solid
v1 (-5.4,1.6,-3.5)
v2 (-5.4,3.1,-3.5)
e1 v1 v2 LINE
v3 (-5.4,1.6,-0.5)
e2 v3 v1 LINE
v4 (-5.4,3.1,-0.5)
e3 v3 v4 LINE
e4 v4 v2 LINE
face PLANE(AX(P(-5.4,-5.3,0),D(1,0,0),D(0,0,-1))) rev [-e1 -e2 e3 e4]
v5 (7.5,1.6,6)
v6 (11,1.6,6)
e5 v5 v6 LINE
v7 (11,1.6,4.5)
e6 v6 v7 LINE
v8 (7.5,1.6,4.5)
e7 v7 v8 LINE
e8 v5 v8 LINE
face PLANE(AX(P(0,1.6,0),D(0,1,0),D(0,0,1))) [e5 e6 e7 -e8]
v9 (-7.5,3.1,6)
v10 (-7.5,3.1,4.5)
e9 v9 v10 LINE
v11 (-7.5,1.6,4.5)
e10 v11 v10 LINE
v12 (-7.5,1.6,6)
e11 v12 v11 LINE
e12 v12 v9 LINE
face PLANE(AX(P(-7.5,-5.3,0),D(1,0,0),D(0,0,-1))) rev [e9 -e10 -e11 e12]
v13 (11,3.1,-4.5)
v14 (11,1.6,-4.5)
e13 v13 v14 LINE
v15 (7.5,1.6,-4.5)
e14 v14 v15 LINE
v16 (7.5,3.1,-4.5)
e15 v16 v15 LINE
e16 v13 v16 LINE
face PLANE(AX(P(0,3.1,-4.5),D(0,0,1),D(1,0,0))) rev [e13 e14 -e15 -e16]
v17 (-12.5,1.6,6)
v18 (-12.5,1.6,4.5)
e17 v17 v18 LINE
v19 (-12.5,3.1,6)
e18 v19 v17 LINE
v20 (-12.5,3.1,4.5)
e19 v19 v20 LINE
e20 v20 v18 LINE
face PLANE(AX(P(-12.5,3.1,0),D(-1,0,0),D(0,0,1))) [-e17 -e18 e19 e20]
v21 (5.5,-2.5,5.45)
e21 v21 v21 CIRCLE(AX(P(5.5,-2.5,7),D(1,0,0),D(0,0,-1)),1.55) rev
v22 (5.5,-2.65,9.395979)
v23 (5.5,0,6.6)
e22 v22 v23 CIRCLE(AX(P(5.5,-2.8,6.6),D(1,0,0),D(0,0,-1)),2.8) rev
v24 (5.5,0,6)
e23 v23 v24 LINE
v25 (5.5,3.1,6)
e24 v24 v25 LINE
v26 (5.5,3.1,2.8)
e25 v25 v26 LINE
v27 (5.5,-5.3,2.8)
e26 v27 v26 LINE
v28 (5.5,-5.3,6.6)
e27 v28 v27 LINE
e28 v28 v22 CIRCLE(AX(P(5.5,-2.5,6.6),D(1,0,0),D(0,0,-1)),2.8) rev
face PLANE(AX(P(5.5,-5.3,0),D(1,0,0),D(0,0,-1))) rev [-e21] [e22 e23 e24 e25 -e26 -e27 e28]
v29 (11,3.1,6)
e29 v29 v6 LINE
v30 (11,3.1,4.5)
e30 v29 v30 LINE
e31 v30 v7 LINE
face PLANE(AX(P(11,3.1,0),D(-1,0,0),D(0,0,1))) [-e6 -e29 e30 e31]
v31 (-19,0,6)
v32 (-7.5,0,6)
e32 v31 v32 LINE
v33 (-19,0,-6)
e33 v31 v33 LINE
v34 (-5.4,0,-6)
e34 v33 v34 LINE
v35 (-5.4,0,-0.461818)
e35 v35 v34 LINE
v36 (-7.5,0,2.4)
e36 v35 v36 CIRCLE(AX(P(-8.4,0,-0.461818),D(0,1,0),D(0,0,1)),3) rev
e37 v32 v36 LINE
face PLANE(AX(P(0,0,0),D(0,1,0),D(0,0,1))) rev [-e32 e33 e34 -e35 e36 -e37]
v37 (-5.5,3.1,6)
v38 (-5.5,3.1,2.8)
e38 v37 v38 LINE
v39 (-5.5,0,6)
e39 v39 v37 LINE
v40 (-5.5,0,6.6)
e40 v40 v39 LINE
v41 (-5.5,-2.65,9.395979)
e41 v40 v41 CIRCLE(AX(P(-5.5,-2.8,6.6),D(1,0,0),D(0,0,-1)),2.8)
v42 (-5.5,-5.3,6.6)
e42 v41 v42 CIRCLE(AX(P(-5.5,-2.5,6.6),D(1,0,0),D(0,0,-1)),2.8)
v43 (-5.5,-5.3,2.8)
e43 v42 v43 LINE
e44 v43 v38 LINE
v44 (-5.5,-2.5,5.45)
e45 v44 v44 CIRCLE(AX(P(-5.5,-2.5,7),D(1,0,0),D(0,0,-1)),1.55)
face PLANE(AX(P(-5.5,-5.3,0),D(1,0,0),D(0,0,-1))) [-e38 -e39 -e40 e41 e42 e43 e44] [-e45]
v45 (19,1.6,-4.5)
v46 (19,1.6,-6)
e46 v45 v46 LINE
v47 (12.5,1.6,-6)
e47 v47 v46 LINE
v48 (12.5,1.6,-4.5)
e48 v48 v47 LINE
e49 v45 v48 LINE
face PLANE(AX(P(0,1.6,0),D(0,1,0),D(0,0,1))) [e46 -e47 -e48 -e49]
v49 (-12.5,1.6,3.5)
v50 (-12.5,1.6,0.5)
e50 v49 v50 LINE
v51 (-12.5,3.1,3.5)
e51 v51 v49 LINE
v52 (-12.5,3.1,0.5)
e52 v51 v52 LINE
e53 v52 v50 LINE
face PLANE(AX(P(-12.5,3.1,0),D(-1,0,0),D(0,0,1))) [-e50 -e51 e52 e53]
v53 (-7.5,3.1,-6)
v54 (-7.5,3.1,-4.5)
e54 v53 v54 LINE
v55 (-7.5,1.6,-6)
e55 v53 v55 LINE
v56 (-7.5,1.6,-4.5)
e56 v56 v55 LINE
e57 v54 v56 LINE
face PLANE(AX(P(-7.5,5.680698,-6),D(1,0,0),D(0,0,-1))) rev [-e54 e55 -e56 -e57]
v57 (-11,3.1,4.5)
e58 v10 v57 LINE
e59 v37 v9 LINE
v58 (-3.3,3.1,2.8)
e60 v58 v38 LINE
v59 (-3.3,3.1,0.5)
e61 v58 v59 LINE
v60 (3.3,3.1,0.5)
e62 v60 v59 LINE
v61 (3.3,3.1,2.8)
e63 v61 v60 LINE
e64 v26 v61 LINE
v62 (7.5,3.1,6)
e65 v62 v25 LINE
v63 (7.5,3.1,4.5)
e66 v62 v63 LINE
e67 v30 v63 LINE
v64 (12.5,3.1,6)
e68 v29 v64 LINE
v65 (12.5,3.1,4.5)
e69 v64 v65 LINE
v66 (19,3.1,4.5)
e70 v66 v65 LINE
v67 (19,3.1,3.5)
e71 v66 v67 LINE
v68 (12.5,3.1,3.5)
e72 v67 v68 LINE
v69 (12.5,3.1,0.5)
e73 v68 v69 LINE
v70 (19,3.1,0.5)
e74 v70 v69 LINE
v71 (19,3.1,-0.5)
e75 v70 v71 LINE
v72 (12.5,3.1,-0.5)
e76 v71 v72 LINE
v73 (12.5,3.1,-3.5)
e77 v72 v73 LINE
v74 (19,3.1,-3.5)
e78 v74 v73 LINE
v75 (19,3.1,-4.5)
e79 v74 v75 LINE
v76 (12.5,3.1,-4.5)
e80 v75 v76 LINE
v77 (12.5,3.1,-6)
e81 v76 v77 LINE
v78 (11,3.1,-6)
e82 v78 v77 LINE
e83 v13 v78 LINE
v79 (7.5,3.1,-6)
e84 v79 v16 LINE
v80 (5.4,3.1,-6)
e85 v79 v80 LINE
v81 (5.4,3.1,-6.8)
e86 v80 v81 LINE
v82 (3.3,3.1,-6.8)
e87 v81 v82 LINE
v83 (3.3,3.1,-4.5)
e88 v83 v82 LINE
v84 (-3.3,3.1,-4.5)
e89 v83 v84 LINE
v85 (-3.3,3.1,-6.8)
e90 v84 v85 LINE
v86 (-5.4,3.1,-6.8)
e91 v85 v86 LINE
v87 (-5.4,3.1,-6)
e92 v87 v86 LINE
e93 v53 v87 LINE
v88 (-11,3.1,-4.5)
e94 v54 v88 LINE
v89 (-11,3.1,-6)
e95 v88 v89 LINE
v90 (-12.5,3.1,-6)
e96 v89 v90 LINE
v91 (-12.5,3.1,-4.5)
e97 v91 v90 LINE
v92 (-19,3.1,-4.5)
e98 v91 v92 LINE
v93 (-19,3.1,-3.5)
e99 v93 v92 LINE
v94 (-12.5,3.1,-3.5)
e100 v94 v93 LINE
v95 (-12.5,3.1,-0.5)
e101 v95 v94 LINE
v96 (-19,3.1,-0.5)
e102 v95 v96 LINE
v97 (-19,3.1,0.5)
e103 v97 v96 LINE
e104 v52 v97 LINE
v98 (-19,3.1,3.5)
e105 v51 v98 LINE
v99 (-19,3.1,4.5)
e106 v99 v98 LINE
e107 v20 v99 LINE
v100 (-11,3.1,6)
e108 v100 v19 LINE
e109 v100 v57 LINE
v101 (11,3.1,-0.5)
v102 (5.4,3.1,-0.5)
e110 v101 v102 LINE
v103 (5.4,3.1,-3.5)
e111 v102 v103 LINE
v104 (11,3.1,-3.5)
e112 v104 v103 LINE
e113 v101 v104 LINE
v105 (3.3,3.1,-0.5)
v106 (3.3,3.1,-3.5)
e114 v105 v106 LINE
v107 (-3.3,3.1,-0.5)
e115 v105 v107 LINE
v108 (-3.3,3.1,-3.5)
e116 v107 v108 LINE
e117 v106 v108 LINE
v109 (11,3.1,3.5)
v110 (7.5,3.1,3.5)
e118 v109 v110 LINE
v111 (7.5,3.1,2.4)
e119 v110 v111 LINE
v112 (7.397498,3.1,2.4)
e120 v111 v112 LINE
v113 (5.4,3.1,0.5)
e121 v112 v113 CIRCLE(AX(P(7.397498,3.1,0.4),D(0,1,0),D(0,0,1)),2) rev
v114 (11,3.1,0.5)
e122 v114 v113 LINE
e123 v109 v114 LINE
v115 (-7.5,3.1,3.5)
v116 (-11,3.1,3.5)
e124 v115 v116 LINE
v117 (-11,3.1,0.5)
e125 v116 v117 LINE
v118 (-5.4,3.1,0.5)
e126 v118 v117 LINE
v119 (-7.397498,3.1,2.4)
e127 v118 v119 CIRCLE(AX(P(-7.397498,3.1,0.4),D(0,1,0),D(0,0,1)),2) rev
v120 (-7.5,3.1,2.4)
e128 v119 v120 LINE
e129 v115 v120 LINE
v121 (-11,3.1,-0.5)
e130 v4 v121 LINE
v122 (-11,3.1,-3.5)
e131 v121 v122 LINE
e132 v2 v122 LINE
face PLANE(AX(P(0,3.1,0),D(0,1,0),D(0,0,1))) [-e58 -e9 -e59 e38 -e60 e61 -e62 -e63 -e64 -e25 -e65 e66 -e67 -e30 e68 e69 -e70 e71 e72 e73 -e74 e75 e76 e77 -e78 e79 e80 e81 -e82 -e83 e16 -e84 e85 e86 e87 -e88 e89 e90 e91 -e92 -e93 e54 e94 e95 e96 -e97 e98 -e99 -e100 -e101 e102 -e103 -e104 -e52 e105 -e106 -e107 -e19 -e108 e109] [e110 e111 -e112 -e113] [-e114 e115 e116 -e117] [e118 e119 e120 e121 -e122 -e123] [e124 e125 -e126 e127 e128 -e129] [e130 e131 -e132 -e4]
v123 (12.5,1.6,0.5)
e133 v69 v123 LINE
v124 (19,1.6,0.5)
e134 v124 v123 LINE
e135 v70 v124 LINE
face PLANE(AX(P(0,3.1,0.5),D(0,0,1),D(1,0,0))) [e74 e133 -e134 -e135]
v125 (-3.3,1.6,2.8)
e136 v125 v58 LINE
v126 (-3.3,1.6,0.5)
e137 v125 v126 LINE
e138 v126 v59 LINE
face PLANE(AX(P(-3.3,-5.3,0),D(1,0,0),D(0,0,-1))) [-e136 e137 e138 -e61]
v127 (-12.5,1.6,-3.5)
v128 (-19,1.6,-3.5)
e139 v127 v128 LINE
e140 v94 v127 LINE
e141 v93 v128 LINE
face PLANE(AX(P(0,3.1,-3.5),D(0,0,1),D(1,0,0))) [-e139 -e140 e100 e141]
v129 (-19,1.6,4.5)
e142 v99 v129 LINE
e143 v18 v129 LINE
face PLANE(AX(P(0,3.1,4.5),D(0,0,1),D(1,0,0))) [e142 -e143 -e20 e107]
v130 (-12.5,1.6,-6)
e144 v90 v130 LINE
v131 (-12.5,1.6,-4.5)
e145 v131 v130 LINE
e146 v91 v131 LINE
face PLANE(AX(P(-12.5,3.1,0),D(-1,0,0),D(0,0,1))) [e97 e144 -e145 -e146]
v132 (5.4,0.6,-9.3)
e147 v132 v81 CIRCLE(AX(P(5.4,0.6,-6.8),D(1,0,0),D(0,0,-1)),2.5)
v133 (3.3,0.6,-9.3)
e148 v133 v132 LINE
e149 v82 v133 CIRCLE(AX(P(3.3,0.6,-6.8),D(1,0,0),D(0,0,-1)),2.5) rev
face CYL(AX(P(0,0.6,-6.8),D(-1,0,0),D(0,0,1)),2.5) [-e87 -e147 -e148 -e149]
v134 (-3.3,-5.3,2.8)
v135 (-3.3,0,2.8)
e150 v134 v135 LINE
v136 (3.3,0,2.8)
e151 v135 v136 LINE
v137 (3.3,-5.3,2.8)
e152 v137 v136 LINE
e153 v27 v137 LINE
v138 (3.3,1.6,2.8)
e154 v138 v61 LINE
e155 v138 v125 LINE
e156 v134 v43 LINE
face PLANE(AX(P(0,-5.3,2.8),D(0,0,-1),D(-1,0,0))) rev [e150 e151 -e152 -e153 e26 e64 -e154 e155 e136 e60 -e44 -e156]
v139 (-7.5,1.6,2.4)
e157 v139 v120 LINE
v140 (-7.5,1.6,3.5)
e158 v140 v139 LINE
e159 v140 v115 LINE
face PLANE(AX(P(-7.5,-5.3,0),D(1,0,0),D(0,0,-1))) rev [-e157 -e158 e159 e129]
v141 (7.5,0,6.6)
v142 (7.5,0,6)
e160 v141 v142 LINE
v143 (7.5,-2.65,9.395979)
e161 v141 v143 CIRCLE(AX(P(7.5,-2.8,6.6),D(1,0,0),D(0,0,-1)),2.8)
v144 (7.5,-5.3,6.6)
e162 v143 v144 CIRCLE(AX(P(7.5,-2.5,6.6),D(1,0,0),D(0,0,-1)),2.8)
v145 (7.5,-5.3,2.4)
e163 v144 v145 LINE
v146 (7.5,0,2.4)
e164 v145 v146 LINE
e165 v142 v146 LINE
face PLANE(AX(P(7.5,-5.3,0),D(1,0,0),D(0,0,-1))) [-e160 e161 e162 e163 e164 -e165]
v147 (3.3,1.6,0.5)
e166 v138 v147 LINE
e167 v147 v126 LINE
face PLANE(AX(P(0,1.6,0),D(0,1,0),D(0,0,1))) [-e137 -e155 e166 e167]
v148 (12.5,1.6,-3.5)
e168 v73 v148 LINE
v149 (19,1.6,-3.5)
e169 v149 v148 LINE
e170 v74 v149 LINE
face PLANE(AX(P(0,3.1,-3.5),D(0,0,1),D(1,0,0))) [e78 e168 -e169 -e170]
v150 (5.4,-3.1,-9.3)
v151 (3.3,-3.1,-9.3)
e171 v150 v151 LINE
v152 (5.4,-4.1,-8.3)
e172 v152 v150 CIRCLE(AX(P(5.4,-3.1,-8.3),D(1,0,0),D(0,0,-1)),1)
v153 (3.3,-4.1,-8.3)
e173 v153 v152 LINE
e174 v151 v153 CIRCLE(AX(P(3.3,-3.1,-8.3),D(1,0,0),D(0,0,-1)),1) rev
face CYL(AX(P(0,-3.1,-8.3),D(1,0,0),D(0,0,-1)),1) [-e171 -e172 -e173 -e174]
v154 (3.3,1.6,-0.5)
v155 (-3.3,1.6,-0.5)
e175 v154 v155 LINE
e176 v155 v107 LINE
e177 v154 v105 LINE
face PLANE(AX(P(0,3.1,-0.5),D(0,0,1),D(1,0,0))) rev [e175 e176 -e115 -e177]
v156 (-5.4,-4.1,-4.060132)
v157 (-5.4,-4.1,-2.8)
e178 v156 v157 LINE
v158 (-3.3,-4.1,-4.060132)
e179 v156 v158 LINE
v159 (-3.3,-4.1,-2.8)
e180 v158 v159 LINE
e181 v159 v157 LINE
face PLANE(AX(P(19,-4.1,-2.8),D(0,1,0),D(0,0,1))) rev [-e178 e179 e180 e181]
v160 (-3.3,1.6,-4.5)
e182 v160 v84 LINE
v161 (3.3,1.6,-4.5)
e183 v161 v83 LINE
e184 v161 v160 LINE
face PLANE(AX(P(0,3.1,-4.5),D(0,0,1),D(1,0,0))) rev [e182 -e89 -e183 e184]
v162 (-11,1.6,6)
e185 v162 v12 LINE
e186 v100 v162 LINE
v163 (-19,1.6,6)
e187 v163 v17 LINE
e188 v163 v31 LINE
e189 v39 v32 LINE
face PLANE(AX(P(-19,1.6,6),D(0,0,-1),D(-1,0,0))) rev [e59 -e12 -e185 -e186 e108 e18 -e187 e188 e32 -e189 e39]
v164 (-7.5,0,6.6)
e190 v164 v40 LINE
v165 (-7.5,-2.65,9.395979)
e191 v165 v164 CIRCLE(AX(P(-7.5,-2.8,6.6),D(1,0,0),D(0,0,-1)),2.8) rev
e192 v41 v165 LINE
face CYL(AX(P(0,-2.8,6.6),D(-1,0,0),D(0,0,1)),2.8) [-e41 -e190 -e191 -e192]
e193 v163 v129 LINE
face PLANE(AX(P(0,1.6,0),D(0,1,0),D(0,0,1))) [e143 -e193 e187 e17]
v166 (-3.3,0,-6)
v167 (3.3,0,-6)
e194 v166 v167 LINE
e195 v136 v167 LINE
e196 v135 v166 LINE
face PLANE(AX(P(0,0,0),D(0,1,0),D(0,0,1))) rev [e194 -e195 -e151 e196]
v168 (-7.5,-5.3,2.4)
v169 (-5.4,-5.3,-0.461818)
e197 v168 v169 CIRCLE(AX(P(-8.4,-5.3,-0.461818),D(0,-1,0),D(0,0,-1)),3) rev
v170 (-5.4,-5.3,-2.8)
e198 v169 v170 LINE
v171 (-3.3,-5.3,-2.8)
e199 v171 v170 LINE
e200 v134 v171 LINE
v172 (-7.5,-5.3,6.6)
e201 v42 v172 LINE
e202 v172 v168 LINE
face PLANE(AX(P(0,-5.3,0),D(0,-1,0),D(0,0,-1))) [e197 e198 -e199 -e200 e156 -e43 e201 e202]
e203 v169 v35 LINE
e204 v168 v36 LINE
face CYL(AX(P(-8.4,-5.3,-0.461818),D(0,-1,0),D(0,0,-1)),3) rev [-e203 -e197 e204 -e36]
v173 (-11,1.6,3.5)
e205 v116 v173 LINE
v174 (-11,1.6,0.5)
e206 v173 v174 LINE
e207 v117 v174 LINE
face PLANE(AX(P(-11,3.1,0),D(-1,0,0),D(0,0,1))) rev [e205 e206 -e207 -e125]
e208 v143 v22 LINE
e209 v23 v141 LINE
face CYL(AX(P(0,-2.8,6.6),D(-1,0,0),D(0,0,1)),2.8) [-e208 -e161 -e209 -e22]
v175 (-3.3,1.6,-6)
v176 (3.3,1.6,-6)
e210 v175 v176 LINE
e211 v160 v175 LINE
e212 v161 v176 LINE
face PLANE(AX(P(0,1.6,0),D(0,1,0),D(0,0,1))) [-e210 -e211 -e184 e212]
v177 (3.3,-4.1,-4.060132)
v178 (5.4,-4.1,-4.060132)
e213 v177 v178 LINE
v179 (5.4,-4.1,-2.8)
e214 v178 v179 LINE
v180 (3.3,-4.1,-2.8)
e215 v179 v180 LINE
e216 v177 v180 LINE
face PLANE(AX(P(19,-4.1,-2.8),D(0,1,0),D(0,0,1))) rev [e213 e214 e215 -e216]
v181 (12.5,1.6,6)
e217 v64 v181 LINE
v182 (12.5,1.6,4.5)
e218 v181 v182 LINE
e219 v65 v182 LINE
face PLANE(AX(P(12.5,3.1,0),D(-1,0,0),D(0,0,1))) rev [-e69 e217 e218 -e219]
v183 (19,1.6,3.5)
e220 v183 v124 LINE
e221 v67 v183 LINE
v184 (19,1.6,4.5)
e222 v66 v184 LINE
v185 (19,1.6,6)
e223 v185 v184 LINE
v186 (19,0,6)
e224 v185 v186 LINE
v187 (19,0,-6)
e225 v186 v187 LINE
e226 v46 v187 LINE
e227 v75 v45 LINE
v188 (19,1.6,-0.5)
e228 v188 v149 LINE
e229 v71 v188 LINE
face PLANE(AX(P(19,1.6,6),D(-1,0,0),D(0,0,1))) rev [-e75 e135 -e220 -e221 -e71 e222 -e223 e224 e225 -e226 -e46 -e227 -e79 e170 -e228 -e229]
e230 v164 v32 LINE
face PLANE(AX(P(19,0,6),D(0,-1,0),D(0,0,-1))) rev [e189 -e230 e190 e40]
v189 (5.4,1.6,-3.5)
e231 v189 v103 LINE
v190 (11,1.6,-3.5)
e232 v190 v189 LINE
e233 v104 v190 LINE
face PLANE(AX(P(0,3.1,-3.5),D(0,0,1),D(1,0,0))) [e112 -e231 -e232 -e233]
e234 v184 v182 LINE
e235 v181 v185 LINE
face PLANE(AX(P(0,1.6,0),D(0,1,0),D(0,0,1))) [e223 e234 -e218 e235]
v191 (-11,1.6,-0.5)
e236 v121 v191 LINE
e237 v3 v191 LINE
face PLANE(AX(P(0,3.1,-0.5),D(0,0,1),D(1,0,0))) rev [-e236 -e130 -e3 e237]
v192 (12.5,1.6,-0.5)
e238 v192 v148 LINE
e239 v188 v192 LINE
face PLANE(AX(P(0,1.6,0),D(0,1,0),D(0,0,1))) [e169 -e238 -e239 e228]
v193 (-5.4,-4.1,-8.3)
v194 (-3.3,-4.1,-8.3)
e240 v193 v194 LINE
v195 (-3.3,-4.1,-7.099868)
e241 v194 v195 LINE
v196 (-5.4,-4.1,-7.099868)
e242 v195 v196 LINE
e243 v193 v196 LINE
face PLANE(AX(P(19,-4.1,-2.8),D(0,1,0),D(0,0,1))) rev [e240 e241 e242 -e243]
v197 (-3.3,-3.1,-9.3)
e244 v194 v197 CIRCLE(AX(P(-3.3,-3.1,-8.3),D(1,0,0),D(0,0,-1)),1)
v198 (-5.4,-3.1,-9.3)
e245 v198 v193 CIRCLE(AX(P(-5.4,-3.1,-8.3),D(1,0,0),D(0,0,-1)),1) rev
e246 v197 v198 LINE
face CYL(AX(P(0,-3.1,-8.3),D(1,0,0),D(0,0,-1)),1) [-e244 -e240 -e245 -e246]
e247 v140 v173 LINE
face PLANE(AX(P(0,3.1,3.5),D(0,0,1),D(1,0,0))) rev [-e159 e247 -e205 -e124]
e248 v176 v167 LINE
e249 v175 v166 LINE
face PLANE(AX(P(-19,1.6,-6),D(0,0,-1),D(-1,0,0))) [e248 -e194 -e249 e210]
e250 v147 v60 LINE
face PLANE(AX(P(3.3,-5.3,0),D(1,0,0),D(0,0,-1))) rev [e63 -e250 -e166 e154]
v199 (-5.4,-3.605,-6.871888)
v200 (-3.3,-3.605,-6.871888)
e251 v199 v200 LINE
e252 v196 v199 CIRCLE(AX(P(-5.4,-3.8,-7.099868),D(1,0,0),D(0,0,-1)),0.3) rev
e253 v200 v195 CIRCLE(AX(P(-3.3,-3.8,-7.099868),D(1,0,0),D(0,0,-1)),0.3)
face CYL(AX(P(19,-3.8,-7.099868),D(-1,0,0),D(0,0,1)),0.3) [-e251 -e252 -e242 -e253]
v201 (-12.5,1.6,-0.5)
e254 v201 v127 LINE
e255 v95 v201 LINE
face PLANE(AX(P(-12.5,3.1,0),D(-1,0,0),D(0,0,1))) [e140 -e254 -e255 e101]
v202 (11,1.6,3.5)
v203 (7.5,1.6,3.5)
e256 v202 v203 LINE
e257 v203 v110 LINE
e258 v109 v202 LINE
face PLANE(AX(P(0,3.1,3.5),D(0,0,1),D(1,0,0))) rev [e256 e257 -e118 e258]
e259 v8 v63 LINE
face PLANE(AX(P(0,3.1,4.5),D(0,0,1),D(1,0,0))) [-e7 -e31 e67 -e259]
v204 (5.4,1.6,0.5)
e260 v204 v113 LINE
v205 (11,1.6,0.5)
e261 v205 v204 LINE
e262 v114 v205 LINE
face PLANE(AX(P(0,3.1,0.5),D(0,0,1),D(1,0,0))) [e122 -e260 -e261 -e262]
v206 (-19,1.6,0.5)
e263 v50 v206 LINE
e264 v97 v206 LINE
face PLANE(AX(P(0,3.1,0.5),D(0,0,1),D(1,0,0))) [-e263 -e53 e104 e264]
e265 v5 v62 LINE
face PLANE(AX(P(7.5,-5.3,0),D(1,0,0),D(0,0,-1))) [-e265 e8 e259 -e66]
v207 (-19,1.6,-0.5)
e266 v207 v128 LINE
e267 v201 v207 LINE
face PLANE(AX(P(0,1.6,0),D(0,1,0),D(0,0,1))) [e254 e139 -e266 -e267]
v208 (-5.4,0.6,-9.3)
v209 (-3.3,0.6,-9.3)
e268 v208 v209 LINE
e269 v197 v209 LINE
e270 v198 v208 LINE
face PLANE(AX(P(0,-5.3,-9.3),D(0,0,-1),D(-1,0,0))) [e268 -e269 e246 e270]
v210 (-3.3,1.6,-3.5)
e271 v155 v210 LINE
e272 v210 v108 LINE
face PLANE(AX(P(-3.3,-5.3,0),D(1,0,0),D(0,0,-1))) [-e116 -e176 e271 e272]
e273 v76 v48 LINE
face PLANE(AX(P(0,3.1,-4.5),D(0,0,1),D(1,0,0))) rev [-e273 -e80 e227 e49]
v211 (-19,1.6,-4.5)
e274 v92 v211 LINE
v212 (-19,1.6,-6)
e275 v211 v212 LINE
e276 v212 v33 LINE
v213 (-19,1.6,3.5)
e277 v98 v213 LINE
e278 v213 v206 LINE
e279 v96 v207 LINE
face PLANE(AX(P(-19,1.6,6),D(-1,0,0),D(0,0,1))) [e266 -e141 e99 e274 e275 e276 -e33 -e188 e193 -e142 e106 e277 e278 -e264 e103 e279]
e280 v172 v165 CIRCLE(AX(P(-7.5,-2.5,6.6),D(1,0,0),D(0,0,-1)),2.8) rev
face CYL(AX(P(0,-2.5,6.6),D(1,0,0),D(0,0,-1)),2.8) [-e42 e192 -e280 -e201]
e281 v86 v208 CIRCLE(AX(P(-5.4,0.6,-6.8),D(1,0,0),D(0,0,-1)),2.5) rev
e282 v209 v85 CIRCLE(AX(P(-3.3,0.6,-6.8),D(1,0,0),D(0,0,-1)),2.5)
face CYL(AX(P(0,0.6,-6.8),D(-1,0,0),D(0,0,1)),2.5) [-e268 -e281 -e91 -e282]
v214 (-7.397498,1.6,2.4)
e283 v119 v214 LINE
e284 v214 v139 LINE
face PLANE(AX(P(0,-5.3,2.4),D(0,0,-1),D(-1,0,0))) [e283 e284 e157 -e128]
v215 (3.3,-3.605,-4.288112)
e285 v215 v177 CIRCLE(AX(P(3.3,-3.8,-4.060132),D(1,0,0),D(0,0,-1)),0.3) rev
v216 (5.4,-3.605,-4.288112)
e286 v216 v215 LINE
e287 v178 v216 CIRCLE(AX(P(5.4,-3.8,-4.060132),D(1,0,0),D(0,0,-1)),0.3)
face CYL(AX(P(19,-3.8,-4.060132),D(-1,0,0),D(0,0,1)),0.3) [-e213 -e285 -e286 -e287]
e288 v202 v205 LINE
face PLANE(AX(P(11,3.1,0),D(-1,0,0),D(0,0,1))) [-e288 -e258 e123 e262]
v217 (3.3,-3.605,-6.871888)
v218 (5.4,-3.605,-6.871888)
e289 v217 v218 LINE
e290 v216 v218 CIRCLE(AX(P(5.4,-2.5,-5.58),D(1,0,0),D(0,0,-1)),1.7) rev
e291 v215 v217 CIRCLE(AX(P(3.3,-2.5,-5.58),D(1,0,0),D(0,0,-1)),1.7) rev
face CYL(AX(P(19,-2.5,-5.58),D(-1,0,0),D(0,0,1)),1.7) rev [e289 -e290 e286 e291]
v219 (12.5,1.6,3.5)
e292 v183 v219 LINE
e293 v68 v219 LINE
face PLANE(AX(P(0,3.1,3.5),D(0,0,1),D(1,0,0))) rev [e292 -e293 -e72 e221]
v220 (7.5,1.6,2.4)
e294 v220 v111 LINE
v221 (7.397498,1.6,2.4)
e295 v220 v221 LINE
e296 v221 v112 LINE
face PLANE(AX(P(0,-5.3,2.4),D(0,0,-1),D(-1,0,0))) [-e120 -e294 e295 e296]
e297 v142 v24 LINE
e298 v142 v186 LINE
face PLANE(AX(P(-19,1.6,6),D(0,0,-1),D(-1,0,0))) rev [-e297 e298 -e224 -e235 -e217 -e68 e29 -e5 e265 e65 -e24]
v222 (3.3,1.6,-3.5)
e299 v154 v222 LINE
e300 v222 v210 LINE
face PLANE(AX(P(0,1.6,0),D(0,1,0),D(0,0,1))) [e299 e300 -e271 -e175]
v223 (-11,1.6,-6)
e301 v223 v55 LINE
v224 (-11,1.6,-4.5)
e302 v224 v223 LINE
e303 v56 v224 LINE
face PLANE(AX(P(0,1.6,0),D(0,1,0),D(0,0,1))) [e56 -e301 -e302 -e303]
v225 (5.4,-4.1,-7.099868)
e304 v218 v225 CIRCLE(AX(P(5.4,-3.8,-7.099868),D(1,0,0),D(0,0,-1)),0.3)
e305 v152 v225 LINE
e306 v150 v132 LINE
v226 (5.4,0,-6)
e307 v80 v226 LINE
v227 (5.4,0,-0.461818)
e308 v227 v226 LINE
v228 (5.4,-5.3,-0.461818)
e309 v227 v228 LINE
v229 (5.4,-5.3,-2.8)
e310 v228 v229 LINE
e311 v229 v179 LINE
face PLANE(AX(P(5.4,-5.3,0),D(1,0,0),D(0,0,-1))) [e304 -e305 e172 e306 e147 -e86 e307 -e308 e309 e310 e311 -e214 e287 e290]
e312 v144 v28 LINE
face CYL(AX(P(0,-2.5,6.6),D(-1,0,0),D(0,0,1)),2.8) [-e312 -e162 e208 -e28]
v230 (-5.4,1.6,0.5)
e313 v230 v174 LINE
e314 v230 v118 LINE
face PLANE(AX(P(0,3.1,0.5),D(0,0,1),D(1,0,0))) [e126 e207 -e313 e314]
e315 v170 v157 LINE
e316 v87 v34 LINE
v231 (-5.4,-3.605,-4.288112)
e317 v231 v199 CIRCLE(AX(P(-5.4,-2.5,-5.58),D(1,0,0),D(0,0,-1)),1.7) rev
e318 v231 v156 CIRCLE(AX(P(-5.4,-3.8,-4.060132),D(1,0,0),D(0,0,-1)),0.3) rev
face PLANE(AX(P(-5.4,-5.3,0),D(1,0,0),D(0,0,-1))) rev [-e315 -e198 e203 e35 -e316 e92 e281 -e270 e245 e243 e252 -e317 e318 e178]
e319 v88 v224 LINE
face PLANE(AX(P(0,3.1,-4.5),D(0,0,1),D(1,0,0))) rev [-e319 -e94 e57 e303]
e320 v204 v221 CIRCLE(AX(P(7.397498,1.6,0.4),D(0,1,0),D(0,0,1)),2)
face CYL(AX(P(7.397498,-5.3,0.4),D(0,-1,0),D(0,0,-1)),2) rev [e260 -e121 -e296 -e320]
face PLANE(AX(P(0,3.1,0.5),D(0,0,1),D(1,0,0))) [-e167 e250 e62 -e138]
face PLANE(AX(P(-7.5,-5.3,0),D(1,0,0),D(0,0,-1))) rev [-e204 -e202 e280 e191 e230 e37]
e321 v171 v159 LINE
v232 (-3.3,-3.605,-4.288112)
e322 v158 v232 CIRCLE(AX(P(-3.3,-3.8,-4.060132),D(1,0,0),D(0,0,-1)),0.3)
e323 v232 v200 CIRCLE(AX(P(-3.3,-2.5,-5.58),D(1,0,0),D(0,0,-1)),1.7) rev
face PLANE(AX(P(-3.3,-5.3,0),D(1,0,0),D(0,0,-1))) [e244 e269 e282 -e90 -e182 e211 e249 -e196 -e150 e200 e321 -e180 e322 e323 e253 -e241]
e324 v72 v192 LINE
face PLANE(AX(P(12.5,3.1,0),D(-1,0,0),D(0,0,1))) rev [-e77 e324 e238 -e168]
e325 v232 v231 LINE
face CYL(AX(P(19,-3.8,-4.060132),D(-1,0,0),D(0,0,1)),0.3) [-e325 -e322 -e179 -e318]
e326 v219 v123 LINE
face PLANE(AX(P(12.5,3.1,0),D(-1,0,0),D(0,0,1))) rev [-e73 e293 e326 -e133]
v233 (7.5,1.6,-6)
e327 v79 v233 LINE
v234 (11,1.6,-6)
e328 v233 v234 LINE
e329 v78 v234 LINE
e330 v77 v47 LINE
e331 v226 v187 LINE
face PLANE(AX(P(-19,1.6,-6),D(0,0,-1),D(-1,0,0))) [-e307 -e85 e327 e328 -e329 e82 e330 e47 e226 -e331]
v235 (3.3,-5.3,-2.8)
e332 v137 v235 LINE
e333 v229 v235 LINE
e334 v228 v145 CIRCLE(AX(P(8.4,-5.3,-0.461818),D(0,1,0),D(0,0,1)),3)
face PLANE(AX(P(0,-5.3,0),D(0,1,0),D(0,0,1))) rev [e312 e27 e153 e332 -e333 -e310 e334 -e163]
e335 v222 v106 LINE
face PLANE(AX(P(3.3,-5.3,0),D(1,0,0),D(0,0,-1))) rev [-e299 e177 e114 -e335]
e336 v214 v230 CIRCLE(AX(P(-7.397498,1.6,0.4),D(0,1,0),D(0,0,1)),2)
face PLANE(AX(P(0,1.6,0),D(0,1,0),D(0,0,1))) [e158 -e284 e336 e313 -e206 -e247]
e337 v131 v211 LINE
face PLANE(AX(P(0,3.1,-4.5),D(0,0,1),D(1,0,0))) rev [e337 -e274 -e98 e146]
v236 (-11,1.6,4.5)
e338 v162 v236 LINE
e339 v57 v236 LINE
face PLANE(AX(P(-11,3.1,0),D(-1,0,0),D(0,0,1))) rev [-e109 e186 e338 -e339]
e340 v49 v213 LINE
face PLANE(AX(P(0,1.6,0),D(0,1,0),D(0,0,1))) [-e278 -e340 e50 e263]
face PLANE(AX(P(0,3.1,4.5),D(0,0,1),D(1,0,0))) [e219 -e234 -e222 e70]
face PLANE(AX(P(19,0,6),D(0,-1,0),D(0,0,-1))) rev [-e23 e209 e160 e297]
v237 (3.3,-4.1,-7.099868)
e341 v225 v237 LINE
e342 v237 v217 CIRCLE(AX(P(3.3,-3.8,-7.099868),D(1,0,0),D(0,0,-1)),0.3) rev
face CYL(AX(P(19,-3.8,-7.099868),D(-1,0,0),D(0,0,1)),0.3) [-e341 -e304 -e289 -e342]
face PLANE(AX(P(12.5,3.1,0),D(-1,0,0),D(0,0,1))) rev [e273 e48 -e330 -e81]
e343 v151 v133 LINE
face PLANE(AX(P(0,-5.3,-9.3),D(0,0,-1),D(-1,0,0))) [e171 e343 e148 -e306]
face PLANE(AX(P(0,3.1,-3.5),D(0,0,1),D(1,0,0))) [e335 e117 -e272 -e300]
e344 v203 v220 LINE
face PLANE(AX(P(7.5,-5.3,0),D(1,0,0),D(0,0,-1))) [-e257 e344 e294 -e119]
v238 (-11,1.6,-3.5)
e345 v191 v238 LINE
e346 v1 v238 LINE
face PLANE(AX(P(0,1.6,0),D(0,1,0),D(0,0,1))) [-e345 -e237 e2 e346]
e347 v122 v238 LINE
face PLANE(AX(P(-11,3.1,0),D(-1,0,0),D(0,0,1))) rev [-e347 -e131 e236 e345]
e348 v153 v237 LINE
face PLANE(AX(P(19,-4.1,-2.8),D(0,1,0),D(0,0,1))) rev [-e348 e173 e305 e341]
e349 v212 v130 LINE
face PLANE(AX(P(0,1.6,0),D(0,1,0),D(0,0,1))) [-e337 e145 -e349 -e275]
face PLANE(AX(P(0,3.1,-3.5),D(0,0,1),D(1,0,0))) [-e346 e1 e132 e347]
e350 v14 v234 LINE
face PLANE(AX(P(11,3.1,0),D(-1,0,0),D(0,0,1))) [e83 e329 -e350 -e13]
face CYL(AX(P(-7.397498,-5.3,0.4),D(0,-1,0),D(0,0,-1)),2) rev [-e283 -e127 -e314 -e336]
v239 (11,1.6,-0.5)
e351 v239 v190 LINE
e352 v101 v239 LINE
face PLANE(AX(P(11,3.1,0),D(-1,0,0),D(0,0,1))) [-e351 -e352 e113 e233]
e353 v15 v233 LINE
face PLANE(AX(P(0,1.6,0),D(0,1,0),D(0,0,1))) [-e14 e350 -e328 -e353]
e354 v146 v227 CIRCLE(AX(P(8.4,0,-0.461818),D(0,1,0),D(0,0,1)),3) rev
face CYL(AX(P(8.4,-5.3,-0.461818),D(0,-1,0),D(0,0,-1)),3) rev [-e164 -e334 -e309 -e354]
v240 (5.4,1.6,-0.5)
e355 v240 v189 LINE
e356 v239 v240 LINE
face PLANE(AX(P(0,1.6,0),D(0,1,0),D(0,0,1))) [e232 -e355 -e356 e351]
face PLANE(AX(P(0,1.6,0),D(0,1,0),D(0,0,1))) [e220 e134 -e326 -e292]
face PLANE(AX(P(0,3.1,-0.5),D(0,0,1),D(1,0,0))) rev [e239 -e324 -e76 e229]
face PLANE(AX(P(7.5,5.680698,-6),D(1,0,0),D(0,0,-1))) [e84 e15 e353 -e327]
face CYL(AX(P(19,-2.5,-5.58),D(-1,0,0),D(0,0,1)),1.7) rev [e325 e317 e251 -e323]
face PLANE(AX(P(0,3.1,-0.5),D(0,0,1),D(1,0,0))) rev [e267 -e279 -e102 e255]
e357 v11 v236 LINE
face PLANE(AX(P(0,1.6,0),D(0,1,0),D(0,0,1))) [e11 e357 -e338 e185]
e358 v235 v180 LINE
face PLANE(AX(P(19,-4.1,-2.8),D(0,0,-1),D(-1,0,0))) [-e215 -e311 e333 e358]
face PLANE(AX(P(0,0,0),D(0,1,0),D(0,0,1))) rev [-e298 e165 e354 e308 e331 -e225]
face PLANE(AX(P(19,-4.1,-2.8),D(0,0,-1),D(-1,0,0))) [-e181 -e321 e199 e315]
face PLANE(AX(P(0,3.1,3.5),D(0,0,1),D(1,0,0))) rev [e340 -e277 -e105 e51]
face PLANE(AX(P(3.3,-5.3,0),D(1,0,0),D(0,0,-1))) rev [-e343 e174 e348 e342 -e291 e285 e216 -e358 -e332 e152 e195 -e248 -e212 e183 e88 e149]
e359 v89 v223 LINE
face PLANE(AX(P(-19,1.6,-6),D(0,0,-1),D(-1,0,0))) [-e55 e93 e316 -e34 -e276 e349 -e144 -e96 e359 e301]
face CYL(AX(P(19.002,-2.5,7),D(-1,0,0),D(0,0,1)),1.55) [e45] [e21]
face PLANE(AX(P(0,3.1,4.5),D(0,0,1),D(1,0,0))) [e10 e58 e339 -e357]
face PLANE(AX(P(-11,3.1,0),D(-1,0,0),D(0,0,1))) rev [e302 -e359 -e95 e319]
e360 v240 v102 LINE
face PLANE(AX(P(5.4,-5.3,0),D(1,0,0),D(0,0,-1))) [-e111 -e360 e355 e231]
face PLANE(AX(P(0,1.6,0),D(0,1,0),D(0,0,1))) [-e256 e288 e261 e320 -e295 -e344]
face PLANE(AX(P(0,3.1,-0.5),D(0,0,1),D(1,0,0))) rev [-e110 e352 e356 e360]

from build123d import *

# Parameters (mm, degrees)
SKETCH_1_W               = 38
SKETCH_1_H               = 12
EXTRUDE_1_DEPTH          = 1.6
EXTRUDE_START            = 1.6
SKETCH_1_3_W             = 38
SKETCH_1_3_H             = 1
SKETCH_1_3_W_2           = 1.5
SKETCH_1_3_H_2           = 12
EXTRUDE_2_DEPTH          = 1.5
EXTRUDE_START_2          = 3.1
EXTRUDE_3_DEPTH          = 8.4
SKETCH_2_4_W             = 2.1
SKETCH_2_4_H             = 1.5
EXTRUDE_5_DEPTH          = 3.1
CUT_EXTRUDE_1_DEPTH      = 22.850629282
FILLET_1_R               = 3
EXTRUDE_4_REACH          = 28.771
SKETCH_3_R               = 1.55
CUT_EXTRUDE_2_DEPTH      = 27.771253239
CUT_EXTRUDE_2_DEPTH_BACK = 27.771253239
SKETCH_3_3_R             = 1.7
SKETCH_3_3_W             = 6.5
SKETCH_3_3_H             = 1.2
SKETCH_3_3_W_2           = 3.4
SKETCH_3_3_H_2           = 3.1
FILLET_2_R               = 2.8
FILLET_3_R               = 2.5
FILLET_4_R               = 1
FILLET_5_R               = 0.3
FILLET_6_R               = 2


with BuildPart() as part:
    # 草图1 → 凸台-拉伸1 (new body)
    with BuildSketch(Plane(origin=(0, 0, 0), x_dir=(1, 0, 0), z_dir=(0, 1, 0))):
        Rectangle(SKETCH_1_W, SKETCH_1_H)
    extrude(amount=EXTRUDE_1_DEPTH)

    # 草图1<3> → 凸台-拉伸2 (add)
    with BuildSketch(Plane(origin=(0, 0, 0), x_dir=(1, 0, 0), z_dir=(0, 1, 0)).offset(EXTRUDE_START)):
        with Locations((0, 4)):
            Rectangle(SKETCH_1_3_W, SKETCH_1_3_H)
        Rectangle(SKETCH_1_3_W, SKETCH_1_3_H)
        with Locations((0, -4)):
            Rectangle(SKETCH_1_3_W, SKETCH_1_3_H)
        with Locations((-11.75, 0)):
            Rectangle(SKETCH_1_3_W_2, SKETCH_1_3_H_2)
        with Locations((11.75, 0)):
            Rectangle(SKETCH_1_3_W_2, SKETCH_1_3_H_2)
    extrude(amount=EXTRUDE_2_DEPTH)

    # 草图2 → 凸台-拉伸3 (add)
    with BuildSketch(Plane(origin=(0, 0, 0), x_dir=(1, 0, 0), z_dir=(0, 1, 0)).offset(EXTRUDE_START_2)):
        Polygon((-3.3, 9.3), (-5.4, 9.3), (-5.4, -2.4), (-7.5, -2.4), (-7.5, -9.4), (-5.5, -9.4), (-5.5, -2.8), (-3.3, -2.8), align=None)
        Polygon((5.4, 9.3), (3.3, 9.3), (3.3, -2.8), (5.5, -2.8), (5.5, -9.4), (7.5, -9.4), (7.5, -2.4), (5.4, -2.4), align=None)
    extrude(amount=-EXTRUDE_3_DEPTH)

    # 草图2<4> → 凸台-拉伸5 (add)
    with BuildSketch(Plane(origin=(0, 0, 0), x_dir=(1, 0, 0), z_dir=(0, 1, 0))):
        with Locations((-6.45, 5.25)):
            Rectangle(SKETCH_2_4_W, SKETCH_2_4_H)
        with Locations((6.45, 5.25)):
            Rectangle(SKETCH_2_4_W, SKETCH_2_4_H)
    extrude(amount=EXTRUDE_5_DEPTH)

    # 草图2<3> → 切除-拉伸1 (cut, through all)
    with BuildSketch(Plane(origin=(0, 0, 0), x_dir=(1, 0, 0), z_dir=(0, 1, 0))):
        Polygon((0, -9.4), (0, -2.8), (-3.3, -2.8), (-5.4, -2.8), (-5.5, -2.8), (-5.5, -9.4), align=None)
        Polygon((3.3, -2.8), (0, -2.8), (0, -9.4), (5.5, -9.4), (5.5, -2.8), (5.4, -2.8), align=None)
    extrude(amount=CUT_EXTRUDE_1_DEPTH, mode=Mode.SUBTRACT)

    # 圆角1
    # the kernel refuses this fillet: 3 mm, written as the material it adds along each edge
    with BuildSketch(Plane(origin=(5.4, 7.154544011, 2.4), x_dir=(1, 0, 0), z_dir=(0, -1, 0))) as fillet_1_piece_1_section:
        with BuildLine():
            CenterArc((3, -2.861817604), FILLET_1_R, 107.457603124, 72.542396876)
            Line((0, -2.861817604), (0, 0))
            Line((0, 0), (2.1, 0))
        make_face()
    fillet_1_piece_1 = extrude(amount=12.454544011, mode=Mode.PRIVATE)
    fillet_1_piece_1 = split(fillet_1_piece_1, bisect_by=Plane(origin=(6.297598678, 1.6, 1.686657362), z_dir=(0, -1, 0)), keep=Keep.TOP, mode=Mode.PRIVATE)
    add(fillet_1_piece_1)
    with BuildSketch(Plane(origin=(-5.4, 0, 2.4), x_dir=(0, 0, -1), z_dir=(0, -1, 0))) as fillet_1_piece_2:
        with BuildLine():
            CenterArc((2.861817604, -3), FILLET_1_R, 90, 72.542396876)
            Line((0, -2.1), (0, 0))
            Line((0, 0), (2.861817604, 0))
        make_face()
    extrude(amount=5.3)

    # 草图3 → 凸台-拉伸4 (add, up to next)
    with BuildSketch(Plane(origin=(-5.5, 0, 0), x_dir=(0, 0, -1), z_dir=(1, 0, 0)), mode=Mode.PRIVATE) as extrude_4_sk1:
        with Locations((-7, -2.5)):
            Circle(SKETCH_3_R)
    extrude_4_tool1 = extrude(extrude_4_sk1.sketch, amount=EXTRUDE_4_REACH, mode=Mode.PRIVATE) - part.part
    add(extrude_4_tool1.solids().sort_by_distance((-5.5, -2.5, 7))[0])

    # 草图3<3> → 切除-拉伸2 (cut, two sides: drawn at the far end of the back side and taken through both)
    with BuildSketch(Plane(origin=(-5.5, 0, 0), x_dir=(0, 0, -1), z_dir=(1, 0, 0)).offset(-CUT_EXTRUDE_2_DEPTH_BACK)):
        with Locations((5.58, -2.5)):
            Circle(SKETCH_3_3_R)
        with Locations((6.05, -4.7)):
            Rectangle(SKETCH_3_3_W, SKETCH_3_3_H)
        with Locations((-7.7, 1.55)):
            Rectangle(SKETCH_3_3_W_2, SKETCH_3_3_H_2)
    extrude(amount=CUT_EXTRUDE_2_DEPTH + CUT_EXTRUDE_2_DEPTH_BACK, mode=Mode.SUBTRACT)

    # 圆角2
    # the kernel refuses this fillet: 2.8 mm, written as the material it takes off along each edge
    with BuildSketch(Plane(origin=(-1.5, 0, 9.4), x_dir=(0, 0, -1), z_dir=(1, 0, 0)), Plane(origin=(-14.5, 0, 9.4), x_dir=(0, 0, -1), z_dir=(1, 0, 0))) as fillet_2_piece_1:
        with BuildLine():
            CenterArc((FILLET_2_R, -FILLET_2_R), FILLET_2_R, 90, 90)
            Line((0, -FILLET_2_R), (0, 0))
            Line((0, 0), (FILLET_2_R, 0))
        make_face()
    extrude(amount=16, mode=Mode.SUBTRACT)
    with BuildSketch(Plane(origin=(-1.5, -5.3, 9.4), x_dir=(0, 0, -1), z_dir=(1, 0, 0)), Plane(origin=(-14.5, -5.3, 9.4), x_dir=(0, 0, -1), z_dir=(1, 0, 0))) as fillet_2_piece_2:
        with BuildLine():
            CenterArc((FILLET_2_R, FILLET_2_R), FILLET_2_R, 180, 90)
            Line((0, FILLET_2_R), (0, 0))
            Line((0, 0), (FILLET_2_R, 0))
        make_face()
    extrude(amount=16, mode=Mode.SUBTRACT)

    # 圆角3
    fillet_3_edges = [part.edges().sort_by_distance(p)[0] for p in [
        (-4.35, 3.1, -9.3),
        (4.35, 3.1, -9.3),
    ]]
    fillet(fillet_3_edges, radius=FILLET_3_R)

    # 圆角4
    fillet_4_edges = [part.edges().sort_by_distance(p)[0] for p in [
        (-4.35, -4.1, -9.3),
        (4.35, -4.1, -9.3),
    ]]
    fillet(fillet_4_edges, radius=FILLET_4_R)

    # 圆角5
    fillet_5_edges = [part.edges().sort_by_distance(p)[0] for p in [
        (-4.35, -4.1, -5.005543735),
        (4.35, -4.1, -5.005543735),
        (-4.35, -4.1, -6.154456265),
        (4.35, -4.1, -6.154456265),
    ]]
    fillet(fillet_5_edges, radius=FILLET_5_R)

    # 圆角6
    # the kernel refuses this fillet: 2 mm, written as the material it adds along each edge
    with BuildSketch(Plane(origin=(5.4, 3.1, 2.4), x_dir=(0, 0, -1), z_dir=(0, -1, 0))) as fillet_6_piece_1:
        with BuildLine():
            CenterArc((2, 1.997498436), FILLET_6_R, 180, 87.134016017)
            Line((0, 1.997498436), (-0.04, 1.997498436))
            Line((-0.04, 1.997498436), (-0.04, 0))
            Line((-0.04, 0), (0, -0.04))
            ThreePointArc((0, -0.04), (0.95, -0.04), (1.898, -0.039949969))
            Line((1.898, -0.039949969), (1.9, 0))
        make_face()
    extrude(amount=6.493746089)
    with BuildSketch(Plane(origin=(-5.4, 3.1, 2.4), x_dir=(-1, 0, 0), z_dir=(0, -1, 0))) as fillet_6_piece_2:
        with BuildLine():
            CenterArc((1.997498436, 2), FILLET_6_R, 182.865983983, 87.134016017)
            Line((0, 1.9), (-0.039949969, 1.898))
            ThreePointArc((-0.039949969, 1.898), (-0.04, 0.95), (-0.04, 0))
            Line((-0.04, 0), (0, -0.04))
            Line((0, -0.04), (1.997498436, -0.04))
            Line((1.997498436, -0.04), (1.997498436, 0))
        make_face()
    extrude(amount=6.493746089)


solid = part.part
